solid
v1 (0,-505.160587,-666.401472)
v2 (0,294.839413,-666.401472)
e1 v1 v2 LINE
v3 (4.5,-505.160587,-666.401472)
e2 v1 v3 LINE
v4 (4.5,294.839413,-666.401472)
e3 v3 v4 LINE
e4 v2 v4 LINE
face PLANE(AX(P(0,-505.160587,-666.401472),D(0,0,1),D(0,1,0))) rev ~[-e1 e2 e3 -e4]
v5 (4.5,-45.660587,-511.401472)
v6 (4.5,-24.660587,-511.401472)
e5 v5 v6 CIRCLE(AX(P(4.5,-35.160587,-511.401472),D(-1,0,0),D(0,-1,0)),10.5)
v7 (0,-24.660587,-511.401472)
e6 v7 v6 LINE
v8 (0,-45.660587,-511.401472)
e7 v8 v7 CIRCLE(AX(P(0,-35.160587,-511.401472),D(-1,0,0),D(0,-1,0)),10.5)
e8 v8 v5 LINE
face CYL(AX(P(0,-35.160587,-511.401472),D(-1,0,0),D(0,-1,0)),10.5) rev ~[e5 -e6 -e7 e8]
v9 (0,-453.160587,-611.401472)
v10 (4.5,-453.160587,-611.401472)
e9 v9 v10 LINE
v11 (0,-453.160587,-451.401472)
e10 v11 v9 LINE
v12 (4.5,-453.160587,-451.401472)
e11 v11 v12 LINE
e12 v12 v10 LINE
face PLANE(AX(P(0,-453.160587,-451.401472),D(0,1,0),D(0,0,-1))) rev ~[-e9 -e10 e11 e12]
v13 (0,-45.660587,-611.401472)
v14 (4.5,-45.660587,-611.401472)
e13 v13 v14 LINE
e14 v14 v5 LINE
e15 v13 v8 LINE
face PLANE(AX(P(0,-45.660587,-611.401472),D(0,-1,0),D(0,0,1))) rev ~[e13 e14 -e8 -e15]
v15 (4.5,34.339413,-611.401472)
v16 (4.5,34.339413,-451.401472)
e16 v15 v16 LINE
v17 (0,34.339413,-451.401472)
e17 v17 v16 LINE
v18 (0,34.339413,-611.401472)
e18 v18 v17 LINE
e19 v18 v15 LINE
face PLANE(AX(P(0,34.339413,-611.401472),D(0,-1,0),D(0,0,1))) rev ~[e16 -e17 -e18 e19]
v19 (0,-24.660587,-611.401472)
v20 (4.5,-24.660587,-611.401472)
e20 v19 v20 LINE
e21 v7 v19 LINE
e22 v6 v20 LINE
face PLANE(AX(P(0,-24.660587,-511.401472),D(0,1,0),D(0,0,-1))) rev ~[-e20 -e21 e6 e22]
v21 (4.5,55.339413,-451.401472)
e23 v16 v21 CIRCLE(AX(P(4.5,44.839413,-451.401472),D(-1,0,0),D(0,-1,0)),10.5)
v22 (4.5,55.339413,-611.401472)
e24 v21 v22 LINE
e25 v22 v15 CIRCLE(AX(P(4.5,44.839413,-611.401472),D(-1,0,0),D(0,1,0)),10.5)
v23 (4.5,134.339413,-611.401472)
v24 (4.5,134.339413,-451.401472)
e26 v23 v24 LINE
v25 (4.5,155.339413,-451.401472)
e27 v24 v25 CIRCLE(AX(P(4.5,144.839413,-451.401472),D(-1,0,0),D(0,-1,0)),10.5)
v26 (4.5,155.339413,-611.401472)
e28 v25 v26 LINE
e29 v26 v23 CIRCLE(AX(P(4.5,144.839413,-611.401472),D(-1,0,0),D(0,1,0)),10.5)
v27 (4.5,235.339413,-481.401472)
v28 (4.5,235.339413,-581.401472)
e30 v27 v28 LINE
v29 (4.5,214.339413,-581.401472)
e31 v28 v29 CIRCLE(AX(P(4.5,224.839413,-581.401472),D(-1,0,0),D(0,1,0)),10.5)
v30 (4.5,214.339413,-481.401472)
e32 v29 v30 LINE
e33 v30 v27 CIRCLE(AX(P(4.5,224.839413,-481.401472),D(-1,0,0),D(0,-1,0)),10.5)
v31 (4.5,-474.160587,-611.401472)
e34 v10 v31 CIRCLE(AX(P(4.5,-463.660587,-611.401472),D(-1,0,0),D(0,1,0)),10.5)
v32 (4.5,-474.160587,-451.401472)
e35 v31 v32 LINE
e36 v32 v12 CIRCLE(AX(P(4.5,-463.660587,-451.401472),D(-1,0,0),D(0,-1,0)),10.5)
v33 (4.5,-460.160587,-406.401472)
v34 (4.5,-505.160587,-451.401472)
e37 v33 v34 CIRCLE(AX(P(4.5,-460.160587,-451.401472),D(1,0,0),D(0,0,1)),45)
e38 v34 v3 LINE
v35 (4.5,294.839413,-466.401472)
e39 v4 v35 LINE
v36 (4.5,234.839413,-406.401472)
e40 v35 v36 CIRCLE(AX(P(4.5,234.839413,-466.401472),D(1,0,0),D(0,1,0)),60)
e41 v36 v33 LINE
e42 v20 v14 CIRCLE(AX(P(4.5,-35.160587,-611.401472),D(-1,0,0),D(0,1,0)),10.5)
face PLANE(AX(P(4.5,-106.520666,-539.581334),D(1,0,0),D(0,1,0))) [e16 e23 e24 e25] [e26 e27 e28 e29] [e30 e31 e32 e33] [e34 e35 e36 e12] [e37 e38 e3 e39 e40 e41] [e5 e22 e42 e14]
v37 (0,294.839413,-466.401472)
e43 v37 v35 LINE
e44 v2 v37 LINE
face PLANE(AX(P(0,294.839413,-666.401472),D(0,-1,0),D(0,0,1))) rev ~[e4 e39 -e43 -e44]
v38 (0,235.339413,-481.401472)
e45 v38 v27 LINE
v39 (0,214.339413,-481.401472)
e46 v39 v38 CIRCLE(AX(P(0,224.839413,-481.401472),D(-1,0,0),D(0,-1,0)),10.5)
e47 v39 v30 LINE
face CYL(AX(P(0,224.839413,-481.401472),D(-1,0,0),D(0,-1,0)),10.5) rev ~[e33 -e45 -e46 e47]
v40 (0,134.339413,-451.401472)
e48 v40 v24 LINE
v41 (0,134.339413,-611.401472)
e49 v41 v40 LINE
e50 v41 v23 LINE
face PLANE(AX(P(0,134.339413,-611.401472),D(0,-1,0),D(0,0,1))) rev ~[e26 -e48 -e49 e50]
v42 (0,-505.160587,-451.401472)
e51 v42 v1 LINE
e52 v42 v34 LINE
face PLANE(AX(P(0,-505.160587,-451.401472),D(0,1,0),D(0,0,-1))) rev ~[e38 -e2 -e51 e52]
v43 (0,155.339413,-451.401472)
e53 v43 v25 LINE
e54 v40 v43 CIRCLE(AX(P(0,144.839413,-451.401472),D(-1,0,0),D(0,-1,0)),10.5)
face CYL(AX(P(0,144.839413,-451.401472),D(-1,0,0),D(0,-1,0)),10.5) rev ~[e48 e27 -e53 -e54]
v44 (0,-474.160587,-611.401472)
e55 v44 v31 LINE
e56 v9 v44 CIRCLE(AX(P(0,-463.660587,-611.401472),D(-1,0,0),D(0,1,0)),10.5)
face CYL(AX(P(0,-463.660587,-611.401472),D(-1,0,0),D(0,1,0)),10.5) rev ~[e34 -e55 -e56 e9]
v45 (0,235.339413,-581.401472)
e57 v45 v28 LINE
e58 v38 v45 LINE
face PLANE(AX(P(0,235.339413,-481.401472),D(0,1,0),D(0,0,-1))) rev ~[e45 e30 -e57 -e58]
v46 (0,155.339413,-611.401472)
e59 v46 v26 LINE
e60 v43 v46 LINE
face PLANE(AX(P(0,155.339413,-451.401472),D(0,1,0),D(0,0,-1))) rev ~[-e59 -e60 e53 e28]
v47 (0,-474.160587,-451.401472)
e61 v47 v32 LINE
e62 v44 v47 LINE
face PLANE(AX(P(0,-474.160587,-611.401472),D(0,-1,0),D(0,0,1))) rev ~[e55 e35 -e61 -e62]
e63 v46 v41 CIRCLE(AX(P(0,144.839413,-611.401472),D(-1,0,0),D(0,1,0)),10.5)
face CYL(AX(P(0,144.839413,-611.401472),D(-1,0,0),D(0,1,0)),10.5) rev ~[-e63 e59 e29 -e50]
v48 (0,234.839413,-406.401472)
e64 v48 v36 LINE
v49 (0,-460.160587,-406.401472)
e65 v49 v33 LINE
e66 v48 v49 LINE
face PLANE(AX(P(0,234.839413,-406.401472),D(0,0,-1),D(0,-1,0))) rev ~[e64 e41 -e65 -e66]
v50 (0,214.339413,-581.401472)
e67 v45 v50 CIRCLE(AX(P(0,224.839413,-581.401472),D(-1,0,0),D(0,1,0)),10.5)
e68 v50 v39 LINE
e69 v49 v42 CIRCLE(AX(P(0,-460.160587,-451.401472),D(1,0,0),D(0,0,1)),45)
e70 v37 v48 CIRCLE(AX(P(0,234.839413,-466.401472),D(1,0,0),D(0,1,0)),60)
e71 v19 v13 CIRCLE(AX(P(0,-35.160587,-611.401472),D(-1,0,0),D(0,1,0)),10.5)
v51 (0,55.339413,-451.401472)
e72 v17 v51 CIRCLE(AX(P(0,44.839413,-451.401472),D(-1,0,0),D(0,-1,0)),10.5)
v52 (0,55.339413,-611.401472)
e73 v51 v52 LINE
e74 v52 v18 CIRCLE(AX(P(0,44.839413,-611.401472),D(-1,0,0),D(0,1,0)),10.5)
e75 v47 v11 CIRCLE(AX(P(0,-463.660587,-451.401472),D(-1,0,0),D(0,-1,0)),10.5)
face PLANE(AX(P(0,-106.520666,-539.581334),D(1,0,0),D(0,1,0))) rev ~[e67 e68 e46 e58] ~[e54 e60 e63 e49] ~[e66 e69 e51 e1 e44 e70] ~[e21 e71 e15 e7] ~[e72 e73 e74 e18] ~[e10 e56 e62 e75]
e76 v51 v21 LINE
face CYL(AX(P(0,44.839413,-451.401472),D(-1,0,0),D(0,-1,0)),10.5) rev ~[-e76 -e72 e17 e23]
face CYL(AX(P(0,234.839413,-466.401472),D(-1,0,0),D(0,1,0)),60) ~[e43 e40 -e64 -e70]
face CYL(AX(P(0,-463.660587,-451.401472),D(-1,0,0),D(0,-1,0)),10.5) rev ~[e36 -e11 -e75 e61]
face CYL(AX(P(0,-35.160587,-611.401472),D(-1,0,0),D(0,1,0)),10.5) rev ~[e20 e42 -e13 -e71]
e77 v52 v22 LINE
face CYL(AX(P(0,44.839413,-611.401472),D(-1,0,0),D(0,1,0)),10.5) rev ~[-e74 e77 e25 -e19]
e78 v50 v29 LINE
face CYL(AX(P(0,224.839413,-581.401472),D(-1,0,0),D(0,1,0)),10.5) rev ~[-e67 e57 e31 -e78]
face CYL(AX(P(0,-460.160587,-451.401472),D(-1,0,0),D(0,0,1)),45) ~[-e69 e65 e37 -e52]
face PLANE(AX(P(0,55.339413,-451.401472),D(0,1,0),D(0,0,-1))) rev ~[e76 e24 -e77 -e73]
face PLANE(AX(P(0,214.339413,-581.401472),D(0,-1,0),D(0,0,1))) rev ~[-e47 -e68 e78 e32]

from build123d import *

# Parameters (mm, degrees)
F1_DEPTH = 4.5


# Not quite as in the source:
# - a feature names something its author has since deleted; it is built from what else it names


with BuildPart() as f1:
    # F0 (on Right) → F1 (new body)
    with BuildSketch(Plane.YZ):
        with BuildLine():
            Line((-100, -666.4014723765), (294.8394132124, -666.4014723765))
            Line((294.8394132124, -666.4014723765), (294.8394132124, -466.4014723765))
            ThreePointArc((294.8394132124, -466.4014723765), (277.2658200836, -423.9750655053), (234.8394132124, -406.4014723765))
            Line((234.8394132124, -406.4014723765), (-460.1605867876, -406.4014723765))
            ThreePointArc((-460.1605867876, -406.4014723765), (-491.980391941, -419.5816672231), (-505.1605867876, -451.4014723765))
            Line((-505.1605867876, -451.4014723765), (-505.1605867876, -666.4014723765))
            Line((-505.1605867876, -666.4014723765), (-100, -666.4014723765))
        make_face()
        with BuildLine():
            ThreePointArc((-24.6605867876, -611.4014723765), (-35.1605867876, -621.9014723765), (-45.6605867876, -611.4014723765))
            Line((-45.6605867876, -611.4014723765), (-45.6605867876, -511.4014723765))
            ThreePointArc((-45.6605867876, -511.4014723765), (-35.1605867876, -500.9014723765), (-24.6605867876, -511.4014723765))
            Line((-24.6605867876, -511.4014723765), (-24.6605867876, -611.4014723765))
        make_face(mode=Mode.SUBTRACT)
        with BuildLine():
            ThreePointArc((-453.1605867876, -611.4014723765), (-463.6605867876, -621.9014723765), (-474.1605867876, -611.4014723765))
            Line((-474.1605867876, -611.4014723765), (-474.1605867876, -451.4014723765))
            ThreePointArc((-474.1605867876, -451.4014723765), (-463.6605867876, -440.9014723765), (-453.1605867876, -451.4014723765))
            Line((-453.1605867876, -451.4014723765), (-453.1605867876, -611.4014723765))
        make_face(mode=Mode.SUBTRACT)
        with BuildLine():
            Line((34.3394132124, -611.4014723765), (34.3394132124, -451.4014723765))
            ThreePointArc((34.3394132124, -451.4014723765), (44.8394132124, -440.9014723765), (55.3394132124, -451.4014723765))
            Line((55.3394132124, -451.4014723765), (55.3394132124, -611.4014723765))
            ThreePointArc((55.3394132124, -611.4014723765), (44.8394132124, -621.9014723765), (34.3394132124, -611.4014723765))
        make_face(mode=Mode.SUBTRACT)
        with BuildLine():
            Line((134.3394132124, -611.4014723765), (134.3394132124, -451.4014723765))
            ThreePointArc((134.3394132124, -451.4014723765), (144.8394132124, -440.9014723765), (155.3394132124, -451.4014723765))
            Line((155.3394132124, -451.4014723765), (155.3394132124, -611.4014723765))
            ThreePointArc((155.3394132124, -611.4014723765), (144.8394132124, -621.9014723765), (134.3394132124, -611.4014723765))
        make_face(mode=Mode.SUBTRACT)
        with BuildLine():
            ThreePointArc((235.3394132124, -581.4014723765), (224.8394132124, -591.9014723765), (214.3394132124, -581.4014723765))
            Line((214.3394132124, -581.4014723765), (214.3394132124, -481.4014723765))
            ThreePointArc((214.3394132124, -481.4014723765), (224.8394132124, -470.9014723765), (235.3394132124, -481.4014723765))
            Line((235.3394132124, -481.4014723765), (235.3394132124, -581.4014723765))
        make_face(mode=Mode.SUBTRACT)
    extrude(amount=F1_DEPTH)


solid = f1.part
